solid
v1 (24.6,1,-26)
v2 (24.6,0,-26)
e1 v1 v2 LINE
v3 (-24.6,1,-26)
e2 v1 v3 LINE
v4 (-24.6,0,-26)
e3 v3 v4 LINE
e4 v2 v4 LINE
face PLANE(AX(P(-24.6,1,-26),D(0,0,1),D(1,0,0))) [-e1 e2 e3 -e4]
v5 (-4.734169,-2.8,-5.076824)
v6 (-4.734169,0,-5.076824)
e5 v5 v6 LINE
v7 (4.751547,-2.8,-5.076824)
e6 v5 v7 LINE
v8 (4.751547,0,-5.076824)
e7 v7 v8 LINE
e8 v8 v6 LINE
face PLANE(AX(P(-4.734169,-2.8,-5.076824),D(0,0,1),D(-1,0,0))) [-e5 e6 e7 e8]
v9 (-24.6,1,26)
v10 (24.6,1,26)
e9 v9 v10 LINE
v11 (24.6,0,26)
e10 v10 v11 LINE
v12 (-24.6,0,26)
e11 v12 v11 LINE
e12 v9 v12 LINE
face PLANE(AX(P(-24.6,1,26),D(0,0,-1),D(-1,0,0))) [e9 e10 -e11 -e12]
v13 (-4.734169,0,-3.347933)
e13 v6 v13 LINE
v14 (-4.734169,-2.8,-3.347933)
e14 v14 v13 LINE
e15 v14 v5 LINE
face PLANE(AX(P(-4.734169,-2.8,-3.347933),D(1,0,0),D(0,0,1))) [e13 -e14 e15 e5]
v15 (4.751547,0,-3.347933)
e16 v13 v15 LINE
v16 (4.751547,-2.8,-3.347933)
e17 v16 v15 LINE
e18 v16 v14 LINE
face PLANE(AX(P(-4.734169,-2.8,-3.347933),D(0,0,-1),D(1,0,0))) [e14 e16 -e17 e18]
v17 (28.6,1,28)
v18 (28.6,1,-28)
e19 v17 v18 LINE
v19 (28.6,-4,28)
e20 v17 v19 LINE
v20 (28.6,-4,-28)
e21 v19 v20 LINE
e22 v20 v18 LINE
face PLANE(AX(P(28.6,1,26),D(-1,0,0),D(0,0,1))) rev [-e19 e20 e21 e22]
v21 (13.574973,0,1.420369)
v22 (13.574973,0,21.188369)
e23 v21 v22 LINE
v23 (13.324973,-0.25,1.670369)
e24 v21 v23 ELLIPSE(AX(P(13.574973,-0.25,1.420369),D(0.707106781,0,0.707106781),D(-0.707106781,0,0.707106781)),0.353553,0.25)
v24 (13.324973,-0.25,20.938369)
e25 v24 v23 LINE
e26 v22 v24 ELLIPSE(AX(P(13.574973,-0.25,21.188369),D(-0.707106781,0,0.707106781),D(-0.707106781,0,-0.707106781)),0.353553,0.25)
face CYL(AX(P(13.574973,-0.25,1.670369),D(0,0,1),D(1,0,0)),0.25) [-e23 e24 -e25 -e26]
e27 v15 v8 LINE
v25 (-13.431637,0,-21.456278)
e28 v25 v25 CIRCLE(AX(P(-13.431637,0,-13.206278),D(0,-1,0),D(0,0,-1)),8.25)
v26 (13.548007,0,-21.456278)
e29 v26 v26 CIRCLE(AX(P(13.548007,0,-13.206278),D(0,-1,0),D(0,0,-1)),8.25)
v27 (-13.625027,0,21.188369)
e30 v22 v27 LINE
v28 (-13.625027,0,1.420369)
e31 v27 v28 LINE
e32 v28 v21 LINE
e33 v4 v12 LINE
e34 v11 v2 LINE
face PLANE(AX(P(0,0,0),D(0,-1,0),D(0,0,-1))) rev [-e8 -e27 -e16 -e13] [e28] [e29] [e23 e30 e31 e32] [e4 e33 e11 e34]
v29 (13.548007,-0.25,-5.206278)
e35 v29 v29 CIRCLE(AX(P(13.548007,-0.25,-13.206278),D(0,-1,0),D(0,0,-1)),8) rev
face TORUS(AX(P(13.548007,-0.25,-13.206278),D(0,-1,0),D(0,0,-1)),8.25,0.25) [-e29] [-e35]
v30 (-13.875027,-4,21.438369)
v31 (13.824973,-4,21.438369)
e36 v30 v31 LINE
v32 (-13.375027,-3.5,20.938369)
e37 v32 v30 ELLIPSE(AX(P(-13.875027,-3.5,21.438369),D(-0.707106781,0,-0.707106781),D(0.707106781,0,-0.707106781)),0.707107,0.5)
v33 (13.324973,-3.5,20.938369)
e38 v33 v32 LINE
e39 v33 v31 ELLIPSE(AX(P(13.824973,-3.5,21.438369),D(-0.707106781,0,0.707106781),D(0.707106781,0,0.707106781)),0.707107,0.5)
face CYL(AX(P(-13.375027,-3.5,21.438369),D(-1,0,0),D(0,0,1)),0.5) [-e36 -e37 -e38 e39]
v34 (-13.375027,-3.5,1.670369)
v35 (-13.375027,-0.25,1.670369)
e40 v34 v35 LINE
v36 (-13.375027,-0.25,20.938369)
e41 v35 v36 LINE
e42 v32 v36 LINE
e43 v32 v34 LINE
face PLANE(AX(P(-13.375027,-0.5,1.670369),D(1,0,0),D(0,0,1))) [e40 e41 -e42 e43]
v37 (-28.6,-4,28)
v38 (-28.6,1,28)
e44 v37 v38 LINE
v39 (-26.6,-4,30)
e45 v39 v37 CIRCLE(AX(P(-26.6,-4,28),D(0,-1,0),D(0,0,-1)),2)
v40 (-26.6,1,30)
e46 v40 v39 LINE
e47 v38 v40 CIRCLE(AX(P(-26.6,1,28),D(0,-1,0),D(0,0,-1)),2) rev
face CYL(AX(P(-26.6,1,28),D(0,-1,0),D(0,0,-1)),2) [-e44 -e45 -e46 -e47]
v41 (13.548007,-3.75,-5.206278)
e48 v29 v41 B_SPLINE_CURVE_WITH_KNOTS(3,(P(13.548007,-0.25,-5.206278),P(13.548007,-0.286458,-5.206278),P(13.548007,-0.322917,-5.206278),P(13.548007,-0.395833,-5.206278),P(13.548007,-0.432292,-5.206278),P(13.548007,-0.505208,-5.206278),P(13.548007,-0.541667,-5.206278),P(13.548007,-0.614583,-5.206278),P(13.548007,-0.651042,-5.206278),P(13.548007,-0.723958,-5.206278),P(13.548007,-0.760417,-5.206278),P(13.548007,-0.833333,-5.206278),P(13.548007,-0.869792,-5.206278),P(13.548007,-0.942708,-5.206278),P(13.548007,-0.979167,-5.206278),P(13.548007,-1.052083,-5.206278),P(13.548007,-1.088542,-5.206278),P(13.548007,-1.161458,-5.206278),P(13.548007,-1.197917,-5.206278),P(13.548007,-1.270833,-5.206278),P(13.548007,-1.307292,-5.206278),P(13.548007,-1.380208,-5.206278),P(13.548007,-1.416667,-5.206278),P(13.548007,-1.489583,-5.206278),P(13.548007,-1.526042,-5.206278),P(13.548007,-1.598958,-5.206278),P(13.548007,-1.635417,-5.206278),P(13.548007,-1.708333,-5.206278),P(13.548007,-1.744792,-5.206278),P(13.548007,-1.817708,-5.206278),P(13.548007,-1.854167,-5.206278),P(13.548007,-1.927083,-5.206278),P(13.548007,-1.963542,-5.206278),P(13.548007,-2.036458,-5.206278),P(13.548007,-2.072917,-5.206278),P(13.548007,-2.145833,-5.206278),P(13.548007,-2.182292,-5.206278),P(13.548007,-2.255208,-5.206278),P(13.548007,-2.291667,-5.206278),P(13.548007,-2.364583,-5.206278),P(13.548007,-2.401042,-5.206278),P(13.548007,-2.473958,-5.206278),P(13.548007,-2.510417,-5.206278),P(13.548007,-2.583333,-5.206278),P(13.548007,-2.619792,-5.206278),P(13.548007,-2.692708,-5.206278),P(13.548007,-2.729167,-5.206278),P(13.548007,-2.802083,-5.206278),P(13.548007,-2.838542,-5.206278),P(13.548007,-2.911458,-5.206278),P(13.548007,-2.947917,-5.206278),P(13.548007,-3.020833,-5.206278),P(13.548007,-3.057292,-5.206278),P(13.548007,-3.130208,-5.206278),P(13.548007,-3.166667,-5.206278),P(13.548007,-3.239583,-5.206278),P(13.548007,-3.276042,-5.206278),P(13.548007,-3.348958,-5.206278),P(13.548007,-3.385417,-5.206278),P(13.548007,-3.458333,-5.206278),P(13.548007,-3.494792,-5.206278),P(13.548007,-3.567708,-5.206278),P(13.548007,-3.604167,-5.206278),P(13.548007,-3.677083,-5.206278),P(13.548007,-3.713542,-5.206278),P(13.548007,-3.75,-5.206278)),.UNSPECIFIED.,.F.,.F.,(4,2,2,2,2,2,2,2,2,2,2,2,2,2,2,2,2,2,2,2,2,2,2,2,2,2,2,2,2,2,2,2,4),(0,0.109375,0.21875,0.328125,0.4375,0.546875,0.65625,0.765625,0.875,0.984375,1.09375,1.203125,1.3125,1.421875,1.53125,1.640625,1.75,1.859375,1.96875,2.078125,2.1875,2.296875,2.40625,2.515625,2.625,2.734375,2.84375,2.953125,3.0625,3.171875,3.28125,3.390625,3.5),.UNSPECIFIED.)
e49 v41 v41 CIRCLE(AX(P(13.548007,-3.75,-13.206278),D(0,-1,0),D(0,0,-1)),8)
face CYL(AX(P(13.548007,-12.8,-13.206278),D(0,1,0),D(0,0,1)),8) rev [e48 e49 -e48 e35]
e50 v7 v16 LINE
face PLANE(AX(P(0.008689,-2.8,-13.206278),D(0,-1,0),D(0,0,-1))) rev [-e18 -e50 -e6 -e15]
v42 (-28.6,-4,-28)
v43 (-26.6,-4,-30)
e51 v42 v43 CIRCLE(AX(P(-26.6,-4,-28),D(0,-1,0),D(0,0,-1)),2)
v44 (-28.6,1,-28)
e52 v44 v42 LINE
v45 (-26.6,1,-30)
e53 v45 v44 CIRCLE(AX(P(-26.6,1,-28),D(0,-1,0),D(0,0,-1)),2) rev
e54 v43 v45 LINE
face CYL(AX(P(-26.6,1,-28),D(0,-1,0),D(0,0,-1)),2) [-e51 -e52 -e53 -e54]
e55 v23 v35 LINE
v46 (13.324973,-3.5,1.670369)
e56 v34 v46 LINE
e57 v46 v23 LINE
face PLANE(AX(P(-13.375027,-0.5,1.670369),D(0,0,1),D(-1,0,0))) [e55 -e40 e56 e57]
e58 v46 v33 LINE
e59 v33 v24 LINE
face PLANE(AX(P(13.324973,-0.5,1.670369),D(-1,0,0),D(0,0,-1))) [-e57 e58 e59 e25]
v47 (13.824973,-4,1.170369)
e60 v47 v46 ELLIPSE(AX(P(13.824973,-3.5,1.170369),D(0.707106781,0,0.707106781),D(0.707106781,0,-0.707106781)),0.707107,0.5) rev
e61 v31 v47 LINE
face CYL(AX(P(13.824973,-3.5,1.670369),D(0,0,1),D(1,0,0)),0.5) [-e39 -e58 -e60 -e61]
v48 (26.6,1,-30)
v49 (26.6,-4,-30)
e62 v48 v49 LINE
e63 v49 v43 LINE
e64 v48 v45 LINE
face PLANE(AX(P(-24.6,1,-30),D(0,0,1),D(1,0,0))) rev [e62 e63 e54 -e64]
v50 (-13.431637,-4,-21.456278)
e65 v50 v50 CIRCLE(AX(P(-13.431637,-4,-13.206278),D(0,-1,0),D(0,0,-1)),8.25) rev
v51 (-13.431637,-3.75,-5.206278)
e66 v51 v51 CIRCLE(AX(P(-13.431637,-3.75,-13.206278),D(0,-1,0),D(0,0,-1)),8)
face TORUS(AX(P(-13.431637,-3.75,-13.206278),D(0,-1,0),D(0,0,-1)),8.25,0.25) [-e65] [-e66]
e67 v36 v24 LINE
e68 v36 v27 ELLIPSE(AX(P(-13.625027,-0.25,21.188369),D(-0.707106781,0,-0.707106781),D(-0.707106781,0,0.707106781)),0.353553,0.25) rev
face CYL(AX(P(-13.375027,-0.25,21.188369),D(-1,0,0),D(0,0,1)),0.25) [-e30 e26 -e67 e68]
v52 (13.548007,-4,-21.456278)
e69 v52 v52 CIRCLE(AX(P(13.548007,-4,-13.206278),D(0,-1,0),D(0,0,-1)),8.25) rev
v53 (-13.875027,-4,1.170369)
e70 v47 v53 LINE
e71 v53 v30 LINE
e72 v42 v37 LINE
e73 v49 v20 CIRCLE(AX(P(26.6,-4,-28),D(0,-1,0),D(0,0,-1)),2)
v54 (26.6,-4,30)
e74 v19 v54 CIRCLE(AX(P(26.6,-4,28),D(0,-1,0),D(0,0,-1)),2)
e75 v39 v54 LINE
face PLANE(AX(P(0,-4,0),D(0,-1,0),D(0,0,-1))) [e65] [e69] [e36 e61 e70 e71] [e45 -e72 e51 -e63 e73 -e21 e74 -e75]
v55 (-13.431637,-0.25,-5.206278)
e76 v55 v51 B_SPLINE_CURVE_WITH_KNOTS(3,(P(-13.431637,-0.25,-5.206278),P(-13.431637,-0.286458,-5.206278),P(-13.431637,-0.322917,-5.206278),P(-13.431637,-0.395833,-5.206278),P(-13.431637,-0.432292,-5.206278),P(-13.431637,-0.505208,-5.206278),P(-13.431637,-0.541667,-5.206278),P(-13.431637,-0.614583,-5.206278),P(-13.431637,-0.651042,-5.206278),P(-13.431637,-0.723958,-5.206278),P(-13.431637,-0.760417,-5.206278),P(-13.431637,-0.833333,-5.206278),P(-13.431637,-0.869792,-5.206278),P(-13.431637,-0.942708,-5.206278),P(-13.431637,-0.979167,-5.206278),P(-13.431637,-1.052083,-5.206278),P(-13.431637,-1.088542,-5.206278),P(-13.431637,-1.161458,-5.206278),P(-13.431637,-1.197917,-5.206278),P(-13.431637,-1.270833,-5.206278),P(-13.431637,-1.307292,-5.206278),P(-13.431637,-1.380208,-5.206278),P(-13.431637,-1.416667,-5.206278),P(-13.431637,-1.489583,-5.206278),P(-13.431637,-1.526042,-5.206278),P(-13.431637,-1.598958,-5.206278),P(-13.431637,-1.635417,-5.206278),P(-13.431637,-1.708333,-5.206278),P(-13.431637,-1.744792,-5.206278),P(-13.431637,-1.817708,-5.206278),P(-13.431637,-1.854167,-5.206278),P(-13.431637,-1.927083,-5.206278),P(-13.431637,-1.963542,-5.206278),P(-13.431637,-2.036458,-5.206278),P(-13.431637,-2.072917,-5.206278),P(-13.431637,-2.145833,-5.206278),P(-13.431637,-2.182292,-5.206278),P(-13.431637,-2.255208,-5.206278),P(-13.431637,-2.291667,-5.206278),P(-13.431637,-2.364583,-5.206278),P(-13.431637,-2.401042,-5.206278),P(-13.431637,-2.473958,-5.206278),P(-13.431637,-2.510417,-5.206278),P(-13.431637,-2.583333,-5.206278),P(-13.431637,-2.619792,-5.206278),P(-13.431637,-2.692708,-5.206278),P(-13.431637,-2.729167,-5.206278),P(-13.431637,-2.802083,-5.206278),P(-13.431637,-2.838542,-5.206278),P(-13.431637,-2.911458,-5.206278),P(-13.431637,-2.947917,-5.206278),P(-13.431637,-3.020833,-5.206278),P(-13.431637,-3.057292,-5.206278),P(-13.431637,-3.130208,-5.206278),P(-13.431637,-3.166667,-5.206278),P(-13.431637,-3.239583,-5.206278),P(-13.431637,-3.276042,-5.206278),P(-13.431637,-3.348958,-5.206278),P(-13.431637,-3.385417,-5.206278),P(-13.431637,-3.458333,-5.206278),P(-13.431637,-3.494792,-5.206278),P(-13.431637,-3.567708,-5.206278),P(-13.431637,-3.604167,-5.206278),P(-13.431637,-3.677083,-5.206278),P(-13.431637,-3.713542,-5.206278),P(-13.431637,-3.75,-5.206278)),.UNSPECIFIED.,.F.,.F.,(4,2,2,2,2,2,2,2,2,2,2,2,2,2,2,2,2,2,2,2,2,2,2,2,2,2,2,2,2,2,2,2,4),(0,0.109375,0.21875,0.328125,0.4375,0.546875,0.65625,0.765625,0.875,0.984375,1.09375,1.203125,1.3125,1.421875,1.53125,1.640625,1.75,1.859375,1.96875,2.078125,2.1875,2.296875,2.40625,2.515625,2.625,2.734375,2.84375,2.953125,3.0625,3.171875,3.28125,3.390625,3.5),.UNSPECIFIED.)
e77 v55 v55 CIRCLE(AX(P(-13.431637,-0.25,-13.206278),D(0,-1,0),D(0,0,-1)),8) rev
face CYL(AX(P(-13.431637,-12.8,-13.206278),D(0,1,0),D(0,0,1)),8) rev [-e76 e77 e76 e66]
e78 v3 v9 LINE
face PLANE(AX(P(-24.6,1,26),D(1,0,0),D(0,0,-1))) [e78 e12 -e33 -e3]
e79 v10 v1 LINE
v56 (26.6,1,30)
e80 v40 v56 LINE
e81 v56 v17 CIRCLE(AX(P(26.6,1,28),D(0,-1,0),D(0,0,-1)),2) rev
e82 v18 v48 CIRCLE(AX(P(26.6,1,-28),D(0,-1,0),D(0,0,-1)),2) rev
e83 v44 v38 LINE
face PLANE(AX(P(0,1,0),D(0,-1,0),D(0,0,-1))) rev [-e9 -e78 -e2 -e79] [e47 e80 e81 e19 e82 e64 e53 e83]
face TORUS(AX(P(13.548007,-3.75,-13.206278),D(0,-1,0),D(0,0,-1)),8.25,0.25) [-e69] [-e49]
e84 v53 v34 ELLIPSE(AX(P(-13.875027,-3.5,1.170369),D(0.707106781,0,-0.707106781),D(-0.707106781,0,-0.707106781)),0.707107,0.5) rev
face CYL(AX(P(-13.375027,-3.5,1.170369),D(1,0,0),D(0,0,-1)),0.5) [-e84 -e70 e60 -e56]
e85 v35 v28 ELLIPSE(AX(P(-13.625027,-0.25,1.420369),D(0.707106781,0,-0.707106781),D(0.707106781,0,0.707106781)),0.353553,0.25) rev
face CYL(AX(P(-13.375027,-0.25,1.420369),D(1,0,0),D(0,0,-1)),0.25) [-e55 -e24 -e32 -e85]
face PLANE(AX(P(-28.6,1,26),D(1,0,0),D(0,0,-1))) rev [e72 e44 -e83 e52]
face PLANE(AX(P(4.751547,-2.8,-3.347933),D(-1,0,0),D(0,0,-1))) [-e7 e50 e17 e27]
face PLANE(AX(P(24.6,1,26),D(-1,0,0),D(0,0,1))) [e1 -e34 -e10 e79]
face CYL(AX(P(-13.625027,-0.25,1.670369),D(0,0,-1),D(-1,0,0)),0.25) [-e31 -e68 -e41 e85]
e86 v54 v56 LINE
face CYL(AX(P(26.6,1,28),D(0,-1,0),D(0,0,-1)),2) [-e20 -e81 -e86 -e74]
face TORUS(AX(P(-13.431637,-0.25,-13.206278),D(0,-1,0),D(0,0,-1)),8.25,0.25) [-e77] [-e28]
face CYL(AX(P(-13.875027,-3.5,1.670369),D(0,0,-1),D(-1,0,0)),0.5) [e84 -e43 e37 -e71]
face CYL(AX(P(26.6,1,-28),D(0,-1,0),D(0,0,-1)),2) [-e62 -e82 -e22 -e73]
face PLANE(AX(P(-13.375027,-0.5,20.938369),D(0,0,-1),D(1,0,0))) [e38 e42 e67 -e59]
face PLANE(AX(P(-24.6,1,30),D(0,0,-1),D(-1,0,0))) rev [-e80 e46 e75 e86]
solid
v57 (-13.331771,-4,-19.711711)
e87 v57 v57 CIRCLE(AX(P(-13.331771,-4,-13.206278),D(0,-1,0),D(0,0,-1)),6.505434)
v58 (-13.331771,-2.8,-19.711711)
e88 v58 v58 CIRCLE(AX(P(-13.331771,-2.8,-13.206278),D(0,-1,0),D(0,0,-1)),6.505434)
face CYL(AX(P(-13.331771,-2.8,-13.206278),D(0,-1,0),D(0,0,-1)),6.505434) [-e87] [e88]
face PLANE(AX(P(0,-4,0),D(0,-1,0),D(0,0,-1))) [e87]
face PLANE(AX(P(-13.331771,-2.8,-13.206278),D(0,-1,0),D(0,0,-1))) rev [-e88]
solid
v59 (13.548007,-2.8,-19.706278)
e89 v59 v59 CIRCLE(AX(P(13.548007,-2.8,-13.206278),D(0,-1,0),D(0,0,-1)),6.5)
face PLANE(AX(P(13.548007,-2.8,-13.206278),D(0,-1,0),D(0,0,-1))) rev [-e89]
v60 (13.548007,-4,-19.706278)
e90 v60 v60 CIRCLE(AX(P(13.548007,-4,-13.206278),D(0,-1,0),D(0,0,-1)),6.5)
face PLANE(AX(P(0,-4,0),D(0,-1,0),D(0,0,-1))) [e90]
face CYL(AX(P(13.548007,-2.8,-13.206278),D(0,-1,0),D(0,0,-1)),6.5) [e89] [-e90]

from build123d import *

# Parameters (mm, degrees)
ESQUISSE1_W              = 49.2
ESQUISSE1_H              = 52
BOSS_EXTRU_1_DEPTH       = 1
COQUE1_T                 = 4
CONG_1_R                 = 2
CONG_2_R                 = 2
CONG_3_R                 = 2
CONG_4_R                 = 2
EMPREINTE1_START         = -2.8
EMPREINTE1_OUTLINE_W     = 9.485715654
EMPREINTE1_OUTLINE_H     = 1.728890806
EMPREINTE1_OUTLINE_R     = 8
EMPREINTE1_DEPTH         = 2.8
EMPREINTE1_START_2       = -4
EMPREINTE1_2_OUTLINE_R   = 8
EMPREINTE1_2_OUTLINE_R_2 = 6.505433518
EMPREINTE1_2_OUTLINE_R_3 = 6.5
EMPREINTE1_2_DEPTH       = 1.2
EMPREINTE2_START         = -13.375027479
EMPREINTE2_OUTLINE_W     = 0.5
EMPREINTE2_OUTLINE_H     = 19.268
EMPREINTE2_DEPTH         = 26.7
ESQUISSE2_W              = 26.7
ESQUISSE2_H              = 19.268
ENL_V_MAT_EXTRU_1_DEPTH  = 10
CONG_5_R                 = 0.5
CONG_6_R                 = 0.25
CONG_7_R                 = 0.25
CONG_8_R                 = 0.25


# Read off the part's stored shape, not the designer's step: Empreinte1, Empreinte2
with BuildPart() as part:
    # Esquisse1 → Boss.-Extru.1 (new body)
    with BuildSketch(Plane(origin=(0, 0, 0), x_dir=(1, 0, 0), z_dir=(0, 1, 0))):
        Rectangle(ESQUISSE1_W, ESQUISSE1_H)
    extrude(amount=BOSS_EXTRU_1_DEPTH)

    # Coque1
    coque1_openings = [part.faces().sort_by_distance(p)[0] for p in [
        (0, 1, 0),
    ]]
    offset(amount=COQUE1_T, openings=coque1_openings, kind=Kind.INTERSECTION)

    # Congé1
    # the kernel refuses this fillet: 2 mm, written as the material it takes off along each edge
    with BuildSketch(Plane(origin=(28.6, -9, 30), x_dir=(-1, 0, 0), z_dir=(0, 1, 0))) as cong_1_piece_1:
        with BuildLine():
            CenterArc((CONG_1_R, -CONG_1_R), CONG_1_R, 90, 90)
            Line((0, -CONG_1_R), (0, 0))
            Line((0, 0), (CONG_1_R, 0))
        make_face()
    extrude(amount=15, mode=Mode.SUBTRACT)

    # Congé2
    cong_2_edges = [part.edges().sort_by_distance(p)[0] for p in [
        (28.6, -1.5, -30),
    ]]
    fillet(cong_2_edges, radius=CONG_2_R)

    # Congé3
    cong_3_edges = [part.edges().sort_by_distance(p)[0] for p in [
        (-28.6, -1.5, -30),
    ]]
    fillet(cong_3_edges, radius=CONG_3_R)

    # Congé4
    cong_4_edges = [part.edges().sort_by_distance(p)[0] for p in [
        (-28.6, -1.5, 30),
    ]]
    fillet(cong_4_edges, radius=CONG_4_R)

    # Empreinte1 outline → Empreinte1 (cut)
    with BuildSketch(Plane(origin=(0, 0, 0), x_dir=(1, 0, 0), z_dir=(0, 1, 0)).offset(EMPREINTE1_START)):
        with Locations((0.008688744, 4.212378703)):
            Rectangle(EMPREINTE1_OUTLINE_W, EMPREINTE1_OUTLINE_H)
        with Locations((-13.431637238, 13.206277507)):
            Circle(EMPREINTE1_OUTLINE_R)
        with Locations((13.548007164, 13.206277507)):
            Circle(EMPREINTE1_OUTLINE_R)
    extrude(amount=EMPREINTE1_DEPTH, mode=Mode.SUBTRACT)

    # Empreinte1 2 outline → Empreinte1 2 (cut)
    # profile 1 of 2: a face of its own
    with BuildSketch(Plane(origin=(0, 0, 0), x_dir=(1, 0, 0), z_dir=(0, 1, 0)).offset(EMPREINTE1_START_2)):
        with Locations((-13.431637238, 13.206277507)):
            Circle(EMPREINTE1_2_OUTLINE_R)
        with Locations((-13.331770872, 13.206277507)):
            Circle(EMPREINTE1_2_OUTLINE_R_2, mode=Mode.SUBTRACT)
    # profile 2 of 2: a face of its own
    with BuildSketch(Plane(origin=(0, 0, 0), x_dir=(1, 0, 0), z_dir=(0, 1, 0)).offset(EMPREINTE1_START_2)):
        with Locations((13.548007164, 13.206277507)):
            Circle(EMPREINTE1_2_OUTLINE_R)
        with Locations((13.548007164, 13.206277507)):
            Circle(EMPREINTE1_2_OUTLINE_R_3, mode=Mode.SUBTRACT)
    extrude(amount=EMPREINTE1_2_DEPTH, mode=Mode.SUBTRACT)

    # Empreinte2 outline → Empreinte2 (cut)
    with BuildSketch(Plane.YZ.offset(EMPREINTE2_START)):
        with Locations((-0.25, 11.304369063)):
            Rectangle(EMPREINTE2_OUTLINE_W, EMPREINTE2_OUTLINE_H)
    extrude(amount=EMPREINTE2_DEPTH, mode=Mode.SUBTRACT)

    # Esquisse2 → Enlèv. mat.-Extru.1 (cut)
    with BuildSketch(Plane(origin=(0, 0, 0), x_dir=(1, 0, 0), z_dir=(0, 1, 0))):
        with Locations((-0.025027479, -11.304369063)):
            Rectangle(ESQUISSE2_W, ESQUISSE2_H)
    extrude(amount=-ENL_V_MAT_EXTRU_1_DEPTH, mode=Mode.SUBTRACT)

    # Congé5
    cong_5_edges = [part.edges().sort_by_distance(p)[0] for p in [
        (-13.375027479, -4, 11.304369063),
        (-0.025027479, -4, 1.670369063),
        (13.324972521, -4, 11.304369063),
        (-0.025027479, -4, 20.938369063),
    ]]
    fillet(cong_5_edges, radius=CONG_5_R)

    # Congé6
    cong_6_edges = [part.edges().sort_by_distance(p)[0] for p in [
        (5.548007164, -4, -13.206277507),
        (-21.431637238, -4, -13.206277507),
    ]]
    fillet(cong_6_edges, radius=CONG_6_R)

    # Congé7
    cong_7_edges = [part.edges().sort_by_distance(p)[0] for p in [
        (-21.431637238, 0, -13.206277507),
        (5.548007164, 0, -13.206277507),
    ]]
    fillet(cong_7_edges, radius=CONG_7_R)

    # Congé8
    cong_8_edges = [part.edges().sort_by_distance(p)[0] for p in [
        (-0.025027479, 0, 1.670369063),
        (-13.375027479, 0, 11.304369063),
        (-0.025027479, 0, 20.938369063),
        (13.324972521, 0, 11.304369063),
    ]]
    fillet(cong_8_edges, radius=CONG_8_R)


solid = part.part
